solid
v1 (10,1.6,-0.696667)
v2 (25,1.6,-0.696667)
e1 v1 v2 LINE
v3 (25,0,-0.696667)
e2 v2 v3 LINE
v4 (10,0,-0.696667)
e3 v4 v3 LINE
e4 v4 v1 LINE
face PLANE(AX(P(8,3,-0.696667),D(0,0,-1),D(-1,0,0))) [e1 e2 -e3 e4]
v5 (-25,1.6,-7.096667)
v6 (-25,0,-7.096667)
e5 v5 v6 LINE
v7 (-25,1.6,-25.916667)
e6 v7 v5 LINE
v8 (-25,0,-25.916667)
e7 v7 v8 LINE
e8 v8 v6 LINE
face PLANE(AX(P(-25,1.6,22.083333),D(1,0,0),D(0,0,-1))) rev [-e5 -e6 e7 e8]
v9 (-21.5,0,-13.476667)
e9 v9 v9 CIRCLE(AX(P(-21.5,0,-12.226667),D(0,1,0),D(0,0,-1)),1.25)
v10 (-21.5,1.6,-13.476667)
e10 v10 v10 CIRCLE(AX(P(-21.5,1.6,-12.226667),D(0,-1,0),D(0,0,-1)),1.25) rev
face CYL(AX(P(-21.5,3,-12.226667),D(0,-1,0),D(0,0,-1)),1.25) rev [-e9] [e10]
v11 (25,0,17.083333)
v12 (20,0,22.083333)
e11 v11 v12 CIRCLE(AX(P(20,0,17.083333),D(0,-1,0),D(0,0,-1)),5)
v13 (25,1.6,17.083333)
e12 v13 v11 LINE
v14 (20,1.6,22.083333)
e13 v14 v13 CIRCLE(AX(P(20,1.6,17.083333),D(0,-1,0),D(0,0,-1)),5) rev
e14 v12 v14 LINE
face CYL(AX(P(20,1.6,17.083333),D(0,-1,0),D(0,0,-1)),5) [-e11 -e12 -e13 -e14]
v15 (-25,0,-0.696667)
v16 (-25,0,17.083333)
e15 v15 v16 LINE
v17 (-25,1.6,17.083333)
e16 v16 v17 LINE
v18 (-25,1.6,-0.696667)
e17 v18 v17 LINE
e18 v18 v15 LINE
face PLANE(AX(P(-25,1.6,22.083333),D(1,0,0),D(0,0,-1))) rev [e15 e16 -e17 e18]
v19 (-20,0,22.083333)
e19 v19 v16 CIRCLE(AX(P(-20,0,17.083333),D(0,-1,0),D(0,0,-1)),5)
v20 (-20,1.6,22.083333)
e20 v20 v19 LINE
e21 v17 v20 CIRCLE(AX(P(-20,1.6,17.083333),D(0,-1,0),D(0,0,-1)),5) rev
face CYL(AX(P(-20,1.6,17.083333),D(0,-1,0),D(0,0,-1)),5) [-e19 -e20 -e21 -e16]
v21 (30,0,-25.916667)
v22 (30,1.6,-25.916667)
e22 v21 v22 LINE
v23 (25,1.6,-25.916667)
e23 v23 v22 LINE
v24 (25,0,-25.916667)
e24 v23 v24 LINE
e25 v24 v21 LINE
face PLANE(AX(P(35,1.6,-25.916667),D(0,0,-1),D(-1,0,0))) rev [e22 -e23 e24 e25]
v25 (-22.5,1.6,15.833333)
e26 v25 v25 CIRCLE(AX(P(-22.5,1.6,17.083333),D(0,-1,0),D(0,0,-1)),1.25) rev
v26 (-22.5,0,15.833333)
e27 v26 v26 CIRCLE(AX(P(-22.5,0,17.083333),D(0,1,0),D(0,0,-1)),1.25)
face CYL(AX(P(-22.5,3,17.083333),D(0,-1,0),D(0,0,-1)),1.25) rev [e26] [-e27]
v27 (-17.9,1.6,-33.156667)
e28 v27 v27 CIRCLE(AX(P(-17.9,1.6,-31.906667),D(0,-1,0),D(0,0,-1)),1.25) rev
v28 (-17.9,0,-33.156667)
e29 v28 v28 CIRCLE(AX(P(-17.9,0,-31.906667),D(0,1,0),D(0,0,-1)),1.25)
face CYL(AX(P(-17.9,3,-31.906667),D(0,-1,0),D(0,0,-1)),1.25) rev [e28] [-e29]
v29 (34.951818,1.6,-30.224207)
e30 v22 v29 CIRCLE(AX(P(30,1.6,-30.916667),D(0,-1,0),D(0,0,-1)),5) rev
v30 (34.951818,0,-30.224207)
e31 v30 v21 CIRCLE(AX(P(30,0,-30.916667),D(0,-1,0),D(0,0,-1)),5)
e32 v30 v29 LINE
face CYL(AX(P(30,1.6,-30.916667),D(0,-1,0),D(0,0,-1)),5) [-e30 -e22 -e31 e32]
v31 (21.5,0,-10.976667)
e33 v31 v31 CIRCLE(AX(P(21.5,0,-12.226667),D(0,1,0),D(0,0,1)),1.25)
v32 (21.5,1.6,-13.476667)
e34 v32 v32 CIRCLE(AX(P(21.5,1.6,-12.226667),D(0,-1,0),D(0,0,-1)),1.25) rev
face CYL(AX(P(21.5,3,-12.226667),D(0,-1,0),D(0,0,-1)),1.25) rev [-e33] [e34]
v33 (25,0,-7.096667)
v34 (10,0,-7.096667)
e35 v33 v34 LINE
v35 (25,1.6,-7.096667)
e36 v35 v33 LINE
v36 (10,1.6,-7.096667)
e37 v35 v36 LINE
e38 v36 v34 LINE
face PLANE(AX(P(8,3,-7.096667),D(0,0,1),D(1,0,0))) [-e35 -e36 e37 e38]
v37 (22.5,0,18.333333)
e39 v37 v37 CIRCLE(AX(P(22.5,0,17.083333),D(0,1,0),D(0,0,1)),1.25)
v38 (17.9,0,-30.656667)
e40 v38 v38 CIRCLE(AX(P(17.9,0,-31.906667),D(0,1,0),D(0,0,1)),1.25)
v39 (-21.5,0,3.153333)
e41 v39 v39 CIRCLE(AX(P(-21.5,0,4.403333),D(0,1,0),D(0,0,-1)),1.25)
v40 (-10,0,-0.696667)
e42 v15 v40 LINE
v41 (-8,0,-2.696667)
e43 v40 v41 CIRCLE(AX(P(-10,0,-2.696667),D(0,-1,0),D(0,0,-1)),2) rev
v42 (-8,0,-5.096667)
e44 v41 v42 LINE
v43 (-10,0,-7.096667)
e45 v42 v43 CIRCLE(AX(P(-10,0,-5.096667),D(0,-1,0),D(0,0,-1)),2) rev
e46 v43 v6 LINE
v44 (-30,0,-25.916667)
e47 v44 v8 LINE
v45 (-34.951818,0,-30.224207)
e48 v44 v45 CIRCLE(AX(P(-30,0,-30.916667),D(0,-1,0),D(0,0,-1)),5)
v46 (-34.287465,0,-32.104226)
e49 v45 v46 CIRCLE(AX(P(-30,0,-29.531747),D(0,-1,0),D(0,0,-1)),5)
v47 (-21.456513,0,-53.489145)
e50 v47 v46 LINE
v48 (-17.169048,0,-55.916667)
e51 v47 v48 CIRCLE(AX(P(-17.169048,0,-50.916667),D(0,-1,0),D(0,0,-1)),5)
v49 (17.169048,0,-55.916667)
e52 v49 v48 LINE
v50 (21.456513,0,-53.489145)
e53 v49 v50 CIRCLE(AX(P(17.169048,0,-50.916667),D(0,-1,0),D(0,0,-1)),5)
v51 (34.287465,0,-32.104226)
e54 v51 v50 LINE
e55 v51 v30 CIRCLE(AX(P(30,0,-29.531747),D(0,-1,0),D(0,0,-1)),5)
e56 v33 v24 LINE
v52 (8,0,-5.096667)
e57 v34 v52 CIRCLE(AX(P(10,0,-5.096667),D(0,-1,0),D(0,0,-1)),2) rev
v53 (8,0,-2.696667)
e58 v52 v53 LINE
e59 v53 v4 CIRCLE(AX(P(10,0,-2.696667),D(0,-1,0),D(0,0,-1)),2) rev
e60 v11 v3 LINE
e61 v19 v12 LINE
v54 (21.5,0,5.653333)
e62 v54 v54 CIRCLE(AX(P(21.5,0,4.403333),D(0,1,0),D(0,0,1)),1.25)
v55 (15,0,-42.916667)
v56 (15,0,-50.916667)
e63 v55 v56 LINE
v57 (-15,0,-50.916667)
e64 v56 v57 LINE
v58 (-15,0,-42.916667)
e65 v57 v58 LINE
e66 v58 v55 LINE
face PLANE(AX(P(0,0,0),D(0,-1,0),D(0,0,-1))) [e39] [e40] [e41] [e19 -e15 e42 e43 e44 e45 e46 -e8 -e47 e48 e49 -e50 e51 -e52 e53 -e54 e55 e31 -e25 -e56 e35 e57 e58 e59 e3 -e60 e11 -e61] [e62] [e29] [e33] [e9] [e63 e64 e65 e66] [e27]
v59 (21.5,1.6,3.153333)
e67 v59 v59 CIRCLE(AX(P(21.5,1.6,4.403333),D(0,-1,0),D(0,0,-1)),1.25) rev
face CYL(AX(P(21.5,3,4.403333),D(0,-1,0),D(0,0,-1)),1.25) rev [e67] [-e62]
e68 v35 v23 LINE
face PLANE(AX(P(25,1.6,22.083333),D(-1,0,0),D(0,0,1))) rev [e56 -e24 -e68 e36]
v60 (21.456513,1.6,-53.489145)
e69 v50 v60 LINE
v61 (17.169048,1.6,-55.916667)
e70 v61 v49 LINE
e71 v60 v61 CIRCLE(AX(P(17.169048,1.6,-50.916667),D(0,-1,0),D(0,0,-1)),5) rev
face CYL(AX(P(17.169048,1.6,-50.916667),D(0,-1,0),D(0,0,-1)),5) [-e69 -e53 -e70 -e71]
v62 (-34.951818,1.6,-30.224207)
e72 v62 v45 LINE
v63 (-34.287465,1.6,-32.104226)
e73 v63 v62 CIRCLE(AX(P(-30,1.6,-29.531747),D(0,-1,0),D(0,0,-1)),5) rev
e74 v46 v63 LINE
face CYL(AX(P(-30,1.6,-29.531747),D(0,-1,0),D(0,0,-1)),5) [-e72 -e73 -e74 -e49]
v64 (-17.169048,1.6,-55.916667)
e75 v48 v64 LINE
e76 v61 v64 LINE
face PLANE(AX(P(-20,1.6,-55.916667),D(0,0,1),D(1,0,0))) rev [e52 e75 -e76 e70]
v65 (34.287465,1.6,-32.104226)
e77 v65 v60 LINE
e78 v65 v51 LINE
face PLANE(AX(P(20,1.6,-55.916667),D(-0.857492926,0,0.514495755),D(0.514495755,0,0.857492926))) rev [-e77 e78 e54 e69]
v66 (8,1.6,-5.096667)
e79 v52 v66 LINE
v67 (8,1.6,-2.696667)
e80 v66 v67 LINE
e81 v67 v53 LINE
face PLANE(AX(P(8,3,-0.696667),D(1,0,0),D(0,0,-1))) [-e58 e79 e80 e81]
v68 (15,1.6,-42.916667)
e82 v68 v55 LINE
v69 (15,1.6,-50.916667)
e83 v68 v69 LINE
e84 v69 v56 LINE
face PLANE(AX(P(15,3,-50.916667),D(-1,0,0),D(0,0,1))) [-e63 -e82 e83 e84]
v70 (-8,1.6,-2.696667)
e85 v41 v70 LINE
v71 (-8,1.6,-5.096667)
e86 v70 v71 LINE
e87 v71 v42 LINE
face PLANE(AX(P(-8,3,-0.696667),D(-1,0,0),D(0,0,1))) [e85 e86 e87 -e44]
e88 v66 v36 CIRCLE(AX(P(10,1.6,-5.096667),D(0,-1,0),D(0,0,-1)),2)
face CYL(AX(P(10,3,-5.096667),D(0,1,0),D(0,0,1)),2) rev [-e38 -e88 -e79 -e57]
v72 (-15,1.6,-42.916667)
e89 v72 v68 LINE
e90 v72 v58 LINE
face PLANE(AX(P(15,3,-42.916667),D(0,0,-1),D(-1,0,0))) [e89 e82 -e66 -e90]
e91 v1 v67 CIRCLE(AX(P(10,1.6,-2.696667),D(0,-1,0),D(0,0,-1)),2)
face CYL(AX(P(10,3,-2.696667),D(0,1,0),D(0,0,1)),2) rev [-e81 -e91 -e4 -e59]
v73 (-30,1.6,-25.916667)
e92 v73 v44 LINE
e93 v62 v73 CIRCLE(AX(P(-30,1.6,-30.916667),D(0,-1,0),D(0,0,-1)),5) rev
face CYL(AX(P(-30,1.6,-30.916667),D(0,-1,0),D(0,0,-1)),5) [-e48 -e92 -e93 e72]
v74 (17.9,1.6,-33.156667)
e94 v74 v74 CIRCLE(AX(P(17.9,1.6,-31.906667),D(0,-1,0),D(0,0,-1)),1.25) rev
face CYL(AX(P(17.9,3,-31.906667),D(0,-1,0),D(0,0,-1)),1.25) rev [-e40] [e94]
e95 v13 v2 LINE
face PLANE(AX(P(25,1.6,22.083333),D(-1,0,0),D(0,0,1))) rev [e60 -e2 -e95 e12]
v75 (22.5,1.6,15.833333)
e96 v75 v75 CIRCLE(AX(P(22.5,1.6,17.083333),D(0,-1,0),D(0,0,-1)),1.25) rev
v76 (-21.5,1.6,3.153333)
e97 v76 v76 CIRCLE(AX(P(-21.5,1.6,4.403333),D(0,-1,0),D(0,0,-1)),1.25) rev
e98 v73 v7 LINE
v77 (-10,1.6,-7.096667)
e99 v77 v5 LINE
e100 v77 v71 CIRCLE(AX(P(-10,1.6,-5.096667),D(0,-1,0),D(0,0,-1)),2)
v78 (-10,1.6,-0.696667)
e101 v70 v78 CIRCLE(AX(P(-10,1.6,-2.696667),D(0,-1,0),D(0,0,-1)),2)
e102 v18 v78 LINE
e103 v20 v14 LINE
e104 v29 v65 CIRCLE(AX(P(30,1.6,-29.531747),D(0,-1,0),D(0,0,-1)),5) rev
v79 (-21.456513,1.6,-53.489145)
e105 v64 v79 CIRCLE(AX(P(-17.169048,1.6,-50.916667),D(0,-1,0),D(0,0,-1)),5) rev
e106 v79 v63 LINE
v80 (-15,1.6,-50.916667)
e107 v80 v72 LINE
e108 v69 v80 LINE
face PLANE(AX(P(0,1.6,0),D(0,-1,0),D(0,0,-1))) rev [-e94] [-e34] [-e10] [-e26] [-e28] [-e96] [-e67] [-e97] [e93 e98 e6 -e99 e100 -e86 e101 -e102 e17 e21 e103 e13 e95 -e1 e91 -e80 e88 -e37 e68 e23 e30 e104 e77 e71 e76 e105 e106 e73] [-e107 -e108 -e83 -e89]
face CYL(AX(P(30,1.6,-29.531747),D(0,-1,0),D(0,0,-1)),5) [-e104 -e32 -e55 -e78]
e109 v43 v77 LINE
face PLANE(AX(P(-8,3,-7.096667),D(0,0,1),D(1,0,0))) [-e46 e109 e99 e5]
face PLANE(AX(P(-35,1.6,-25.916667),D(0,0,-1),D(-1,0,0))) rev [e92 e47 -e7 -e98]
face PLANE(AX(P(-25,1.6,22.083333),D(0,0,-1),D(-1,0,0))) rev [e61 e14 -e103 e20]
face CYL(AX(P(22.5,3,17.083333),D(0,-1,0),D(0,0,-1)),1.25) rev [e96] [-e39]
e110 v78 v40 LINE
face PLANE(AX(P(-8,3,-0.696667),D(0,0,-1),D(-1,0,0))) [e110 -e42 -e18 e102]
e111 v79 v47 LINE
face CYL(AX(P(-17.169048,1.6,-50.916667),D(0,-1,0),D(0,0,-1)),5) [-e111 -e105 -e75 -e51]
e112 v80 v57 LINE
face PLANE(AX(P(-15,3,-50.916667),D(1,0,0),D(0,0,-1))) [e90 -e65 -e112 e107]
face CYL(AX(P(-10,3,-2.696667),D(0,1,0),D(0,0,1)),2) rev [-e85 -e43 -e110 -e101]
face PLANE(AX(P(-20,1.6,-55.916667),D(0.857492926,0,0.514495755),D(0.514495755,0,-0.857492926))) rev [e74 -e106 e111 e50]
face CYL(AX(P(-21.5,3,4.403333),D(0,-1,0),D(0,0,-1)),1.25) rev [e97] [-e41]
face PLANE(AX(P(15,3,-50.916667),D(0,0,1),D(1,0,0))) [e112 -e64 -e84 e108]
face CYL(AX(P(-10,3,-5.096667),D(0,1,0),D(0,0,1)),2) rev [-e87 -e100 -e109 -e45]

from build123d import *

# Parameters (mm, degrees)
BOSS_EXTRUDE1_DEPTH = 1.6
FILLET1_R           = 5
SKETCH2_R           = 1.25
SKETCH2_W           = 17
SKETCH2_H           = 6.4
SKETCH2_W_2         = 30
SKETCH2_H_2         = 8
CUT_EXTRUDE1_DEPTH  = 3
FILLET2_R           = 2


with BuildPart() as part:
    # Sketch1 → Boss-Extrude1 (new body)
    with BuildSketch(Plane(origin=(0, 0, 0), x_dir=(1, 0, 0), z_dir=(0, 1, 0))):
        Polygon((-20, 55.916666667), (20, 55.916666667), (35, 30.916666667), (35, 25.916666667), (25, 25.916666667), (25, -22.083333333), (-25, -22.083333333), (-25, 25.916666667), (-35, 25.916666667), (-35, 30.916666667), align=None)
    extrude(amount=BOSS_EXTRUDE1_DEPTH)

    # Fillet1
    # the kernel refuses this fillet: 5 mm, written as the material it takes off along each edge
    with BuildSketch(Plane(origin=(-20, -7.077379737, -55.916666667), x_dir=(1, 0, 0), z_dir=(0, 1, 0))) as fillet1_piece_1:
        with BuildLine():
            CenterArc((FILLET1_R * 0.566190378969, -FILLET1_R), FILLET1_R, 90, 59.036243468)
            Line((-FILLET1_R * 0.291302546743, -FILLET1_R * 0.485504244572), (0, 0))
            Line((0, 0), (FILLET1_R * 0.566190378969, 0))
        make_face()
    extrude(amount=15.754759474, mode=Mode.SUBTRACT)
    with BuildSketch(Plane(origin=(20, -7.077379737, -55.916666667), x_dir=(-1, 0, 0), z_dir=(0, 1, 0))) as fillet1_piece_2:
        with BuildLine():
            CenterArc((FILLET1_R * 0.566190378969, FILLET1_R), FILLET1_R, 210.963756532, 59.036243468)
            Line((-FILLET1_R * 0.291302546743, FILLET1_R * 0.485504244572), (0, 0))
            Line((0, 0), (FILLET1_R * 0.566190378969, 0))
        make_face()
    extrude(amount=15.754759474, mode=Mode.SUBTRACT)
    with BuildSketch(Plane(origin=(-35, -3.462299562, -30.916666667), x_dir=(0, 0, 1), z_dir=(0, 1, 0)), Plane(origin=(35, -3.462299562, -30.916666667), x_dir=(-0.5144957554275258, 0, -0.8574929257125447), z_dir=(0, 1, 0))) as fillet1_piece_3:
        with BuildLine():
            CenterArc((FILLET1_R * 0.276983964948, FILLET1_R), FILLET1_R, 239.036243468, 30.963756532)
            Line((-FILLET1_R * 0.237511790479, FILLET1_R * 0.142507074287), (0, 0))
            Line((0, 0), (FILLET1_R * 0.276983964948, 0))
        make_face()
    extrude(amount=8.524599124, mode=Mode.SUBTRACT)
    with BuildSketch(Plane(origin=(-25, -12.5, 22.083333333), x_dir=(1, 0, 0), z_dir=(0, 1, 0)), Plane(origin=(25, -12.5, 22.083333333), x_dir=(0, 0, -1), z_dir=(0, 1, 0)), Plane(origin=(-35, -12.5, -25.916666667), x_dir=(1, 0, 0), z_dir=(0, 1, 0)), Plane(origin=(35, -12.5, -25.916666667), x_dir=(0, 0, -1), z_dir=(0, 1, 0))) as fillet1_piece_4:
        with BuildLine():
            CenterArc((FILLET1_R, FILLET1_R), FILLET1_R, 180, 90)
            Line((0, FILLET1_R), (0, 0))
            Line((0, 0), (FILLET1_R, 0))
        make_face()
    extrude(amount=26.6, mode=Mode.SUBTRACT)

    # Sketch2 → Cut-Extrude1 (cut)
    with BuildSketch(Plane(origin=(0, 0, 0), x_dir=(1, 0, 0), z_dir=(0, 1, 0))):
        with Locations(Location((22.5, -17.083333333, 0), (0, 0, 90))):
            Circle(SKETCH2_R)
        with Locations(Location((21.5, -4.403333333, 0), (0, 0, 90))):
            Circle(SKETCH2_R)
        with Locations(Location((17.9, 31.906666667, 0), (0, 0, 90))):
            Circle(SKETCH2_R)
        with Locations(Location((21.5, 12.226666667, 0), (0, 0, 90))):
            Circle(SKETCH2_R)
        with Locations(Location((-17.9, 31.906666667, 0), (0, 0, 90))):
            Circle(SKETCH2_R)
        with Locations(Location((-21.5, 12.226666667, 0), (0, 0, 90))):
            Circle(SKETCH2_R)
        with Locations(Location((-21.5, -4.403333333, 0), (0, 0, 90))):
            Circle(SKETCH2_R)
        with Locations(Location((-22.5, -17.083333333, 0), (0, 0, 90))):
            Circle(SKETCH2_R)
        with Locations((16.5, 3.896666667)):
            Rectangle(SKETCH2_W, SKETCH2_H)
        with Locations((-16.5, 3.896666667)):
            Rectangle(SKETCH2_W, SKETCH2_H)
        with Locations((0, 46.916666667)):
            Rectangle(SKETCH2_W_2, SKETCH2_H_2)
    extrude(amount=CUT_EXTRUDE1_DEPTH, mode=Mode.SUBTRACT)

    # Fillet2
    fillet2_edges = [part.edges().sort_by_distance(p)[0] for p in [
        (8, 0.8, -7.096666667),
        (8, 0.8, -0.696666667),
        (-8, 0.8, -0.696666667),
        (-8, 0.8, -7.096666667),
    ]]
    fillet(fillet2_edges, radius=FILLET2_R)


solid = part.part
